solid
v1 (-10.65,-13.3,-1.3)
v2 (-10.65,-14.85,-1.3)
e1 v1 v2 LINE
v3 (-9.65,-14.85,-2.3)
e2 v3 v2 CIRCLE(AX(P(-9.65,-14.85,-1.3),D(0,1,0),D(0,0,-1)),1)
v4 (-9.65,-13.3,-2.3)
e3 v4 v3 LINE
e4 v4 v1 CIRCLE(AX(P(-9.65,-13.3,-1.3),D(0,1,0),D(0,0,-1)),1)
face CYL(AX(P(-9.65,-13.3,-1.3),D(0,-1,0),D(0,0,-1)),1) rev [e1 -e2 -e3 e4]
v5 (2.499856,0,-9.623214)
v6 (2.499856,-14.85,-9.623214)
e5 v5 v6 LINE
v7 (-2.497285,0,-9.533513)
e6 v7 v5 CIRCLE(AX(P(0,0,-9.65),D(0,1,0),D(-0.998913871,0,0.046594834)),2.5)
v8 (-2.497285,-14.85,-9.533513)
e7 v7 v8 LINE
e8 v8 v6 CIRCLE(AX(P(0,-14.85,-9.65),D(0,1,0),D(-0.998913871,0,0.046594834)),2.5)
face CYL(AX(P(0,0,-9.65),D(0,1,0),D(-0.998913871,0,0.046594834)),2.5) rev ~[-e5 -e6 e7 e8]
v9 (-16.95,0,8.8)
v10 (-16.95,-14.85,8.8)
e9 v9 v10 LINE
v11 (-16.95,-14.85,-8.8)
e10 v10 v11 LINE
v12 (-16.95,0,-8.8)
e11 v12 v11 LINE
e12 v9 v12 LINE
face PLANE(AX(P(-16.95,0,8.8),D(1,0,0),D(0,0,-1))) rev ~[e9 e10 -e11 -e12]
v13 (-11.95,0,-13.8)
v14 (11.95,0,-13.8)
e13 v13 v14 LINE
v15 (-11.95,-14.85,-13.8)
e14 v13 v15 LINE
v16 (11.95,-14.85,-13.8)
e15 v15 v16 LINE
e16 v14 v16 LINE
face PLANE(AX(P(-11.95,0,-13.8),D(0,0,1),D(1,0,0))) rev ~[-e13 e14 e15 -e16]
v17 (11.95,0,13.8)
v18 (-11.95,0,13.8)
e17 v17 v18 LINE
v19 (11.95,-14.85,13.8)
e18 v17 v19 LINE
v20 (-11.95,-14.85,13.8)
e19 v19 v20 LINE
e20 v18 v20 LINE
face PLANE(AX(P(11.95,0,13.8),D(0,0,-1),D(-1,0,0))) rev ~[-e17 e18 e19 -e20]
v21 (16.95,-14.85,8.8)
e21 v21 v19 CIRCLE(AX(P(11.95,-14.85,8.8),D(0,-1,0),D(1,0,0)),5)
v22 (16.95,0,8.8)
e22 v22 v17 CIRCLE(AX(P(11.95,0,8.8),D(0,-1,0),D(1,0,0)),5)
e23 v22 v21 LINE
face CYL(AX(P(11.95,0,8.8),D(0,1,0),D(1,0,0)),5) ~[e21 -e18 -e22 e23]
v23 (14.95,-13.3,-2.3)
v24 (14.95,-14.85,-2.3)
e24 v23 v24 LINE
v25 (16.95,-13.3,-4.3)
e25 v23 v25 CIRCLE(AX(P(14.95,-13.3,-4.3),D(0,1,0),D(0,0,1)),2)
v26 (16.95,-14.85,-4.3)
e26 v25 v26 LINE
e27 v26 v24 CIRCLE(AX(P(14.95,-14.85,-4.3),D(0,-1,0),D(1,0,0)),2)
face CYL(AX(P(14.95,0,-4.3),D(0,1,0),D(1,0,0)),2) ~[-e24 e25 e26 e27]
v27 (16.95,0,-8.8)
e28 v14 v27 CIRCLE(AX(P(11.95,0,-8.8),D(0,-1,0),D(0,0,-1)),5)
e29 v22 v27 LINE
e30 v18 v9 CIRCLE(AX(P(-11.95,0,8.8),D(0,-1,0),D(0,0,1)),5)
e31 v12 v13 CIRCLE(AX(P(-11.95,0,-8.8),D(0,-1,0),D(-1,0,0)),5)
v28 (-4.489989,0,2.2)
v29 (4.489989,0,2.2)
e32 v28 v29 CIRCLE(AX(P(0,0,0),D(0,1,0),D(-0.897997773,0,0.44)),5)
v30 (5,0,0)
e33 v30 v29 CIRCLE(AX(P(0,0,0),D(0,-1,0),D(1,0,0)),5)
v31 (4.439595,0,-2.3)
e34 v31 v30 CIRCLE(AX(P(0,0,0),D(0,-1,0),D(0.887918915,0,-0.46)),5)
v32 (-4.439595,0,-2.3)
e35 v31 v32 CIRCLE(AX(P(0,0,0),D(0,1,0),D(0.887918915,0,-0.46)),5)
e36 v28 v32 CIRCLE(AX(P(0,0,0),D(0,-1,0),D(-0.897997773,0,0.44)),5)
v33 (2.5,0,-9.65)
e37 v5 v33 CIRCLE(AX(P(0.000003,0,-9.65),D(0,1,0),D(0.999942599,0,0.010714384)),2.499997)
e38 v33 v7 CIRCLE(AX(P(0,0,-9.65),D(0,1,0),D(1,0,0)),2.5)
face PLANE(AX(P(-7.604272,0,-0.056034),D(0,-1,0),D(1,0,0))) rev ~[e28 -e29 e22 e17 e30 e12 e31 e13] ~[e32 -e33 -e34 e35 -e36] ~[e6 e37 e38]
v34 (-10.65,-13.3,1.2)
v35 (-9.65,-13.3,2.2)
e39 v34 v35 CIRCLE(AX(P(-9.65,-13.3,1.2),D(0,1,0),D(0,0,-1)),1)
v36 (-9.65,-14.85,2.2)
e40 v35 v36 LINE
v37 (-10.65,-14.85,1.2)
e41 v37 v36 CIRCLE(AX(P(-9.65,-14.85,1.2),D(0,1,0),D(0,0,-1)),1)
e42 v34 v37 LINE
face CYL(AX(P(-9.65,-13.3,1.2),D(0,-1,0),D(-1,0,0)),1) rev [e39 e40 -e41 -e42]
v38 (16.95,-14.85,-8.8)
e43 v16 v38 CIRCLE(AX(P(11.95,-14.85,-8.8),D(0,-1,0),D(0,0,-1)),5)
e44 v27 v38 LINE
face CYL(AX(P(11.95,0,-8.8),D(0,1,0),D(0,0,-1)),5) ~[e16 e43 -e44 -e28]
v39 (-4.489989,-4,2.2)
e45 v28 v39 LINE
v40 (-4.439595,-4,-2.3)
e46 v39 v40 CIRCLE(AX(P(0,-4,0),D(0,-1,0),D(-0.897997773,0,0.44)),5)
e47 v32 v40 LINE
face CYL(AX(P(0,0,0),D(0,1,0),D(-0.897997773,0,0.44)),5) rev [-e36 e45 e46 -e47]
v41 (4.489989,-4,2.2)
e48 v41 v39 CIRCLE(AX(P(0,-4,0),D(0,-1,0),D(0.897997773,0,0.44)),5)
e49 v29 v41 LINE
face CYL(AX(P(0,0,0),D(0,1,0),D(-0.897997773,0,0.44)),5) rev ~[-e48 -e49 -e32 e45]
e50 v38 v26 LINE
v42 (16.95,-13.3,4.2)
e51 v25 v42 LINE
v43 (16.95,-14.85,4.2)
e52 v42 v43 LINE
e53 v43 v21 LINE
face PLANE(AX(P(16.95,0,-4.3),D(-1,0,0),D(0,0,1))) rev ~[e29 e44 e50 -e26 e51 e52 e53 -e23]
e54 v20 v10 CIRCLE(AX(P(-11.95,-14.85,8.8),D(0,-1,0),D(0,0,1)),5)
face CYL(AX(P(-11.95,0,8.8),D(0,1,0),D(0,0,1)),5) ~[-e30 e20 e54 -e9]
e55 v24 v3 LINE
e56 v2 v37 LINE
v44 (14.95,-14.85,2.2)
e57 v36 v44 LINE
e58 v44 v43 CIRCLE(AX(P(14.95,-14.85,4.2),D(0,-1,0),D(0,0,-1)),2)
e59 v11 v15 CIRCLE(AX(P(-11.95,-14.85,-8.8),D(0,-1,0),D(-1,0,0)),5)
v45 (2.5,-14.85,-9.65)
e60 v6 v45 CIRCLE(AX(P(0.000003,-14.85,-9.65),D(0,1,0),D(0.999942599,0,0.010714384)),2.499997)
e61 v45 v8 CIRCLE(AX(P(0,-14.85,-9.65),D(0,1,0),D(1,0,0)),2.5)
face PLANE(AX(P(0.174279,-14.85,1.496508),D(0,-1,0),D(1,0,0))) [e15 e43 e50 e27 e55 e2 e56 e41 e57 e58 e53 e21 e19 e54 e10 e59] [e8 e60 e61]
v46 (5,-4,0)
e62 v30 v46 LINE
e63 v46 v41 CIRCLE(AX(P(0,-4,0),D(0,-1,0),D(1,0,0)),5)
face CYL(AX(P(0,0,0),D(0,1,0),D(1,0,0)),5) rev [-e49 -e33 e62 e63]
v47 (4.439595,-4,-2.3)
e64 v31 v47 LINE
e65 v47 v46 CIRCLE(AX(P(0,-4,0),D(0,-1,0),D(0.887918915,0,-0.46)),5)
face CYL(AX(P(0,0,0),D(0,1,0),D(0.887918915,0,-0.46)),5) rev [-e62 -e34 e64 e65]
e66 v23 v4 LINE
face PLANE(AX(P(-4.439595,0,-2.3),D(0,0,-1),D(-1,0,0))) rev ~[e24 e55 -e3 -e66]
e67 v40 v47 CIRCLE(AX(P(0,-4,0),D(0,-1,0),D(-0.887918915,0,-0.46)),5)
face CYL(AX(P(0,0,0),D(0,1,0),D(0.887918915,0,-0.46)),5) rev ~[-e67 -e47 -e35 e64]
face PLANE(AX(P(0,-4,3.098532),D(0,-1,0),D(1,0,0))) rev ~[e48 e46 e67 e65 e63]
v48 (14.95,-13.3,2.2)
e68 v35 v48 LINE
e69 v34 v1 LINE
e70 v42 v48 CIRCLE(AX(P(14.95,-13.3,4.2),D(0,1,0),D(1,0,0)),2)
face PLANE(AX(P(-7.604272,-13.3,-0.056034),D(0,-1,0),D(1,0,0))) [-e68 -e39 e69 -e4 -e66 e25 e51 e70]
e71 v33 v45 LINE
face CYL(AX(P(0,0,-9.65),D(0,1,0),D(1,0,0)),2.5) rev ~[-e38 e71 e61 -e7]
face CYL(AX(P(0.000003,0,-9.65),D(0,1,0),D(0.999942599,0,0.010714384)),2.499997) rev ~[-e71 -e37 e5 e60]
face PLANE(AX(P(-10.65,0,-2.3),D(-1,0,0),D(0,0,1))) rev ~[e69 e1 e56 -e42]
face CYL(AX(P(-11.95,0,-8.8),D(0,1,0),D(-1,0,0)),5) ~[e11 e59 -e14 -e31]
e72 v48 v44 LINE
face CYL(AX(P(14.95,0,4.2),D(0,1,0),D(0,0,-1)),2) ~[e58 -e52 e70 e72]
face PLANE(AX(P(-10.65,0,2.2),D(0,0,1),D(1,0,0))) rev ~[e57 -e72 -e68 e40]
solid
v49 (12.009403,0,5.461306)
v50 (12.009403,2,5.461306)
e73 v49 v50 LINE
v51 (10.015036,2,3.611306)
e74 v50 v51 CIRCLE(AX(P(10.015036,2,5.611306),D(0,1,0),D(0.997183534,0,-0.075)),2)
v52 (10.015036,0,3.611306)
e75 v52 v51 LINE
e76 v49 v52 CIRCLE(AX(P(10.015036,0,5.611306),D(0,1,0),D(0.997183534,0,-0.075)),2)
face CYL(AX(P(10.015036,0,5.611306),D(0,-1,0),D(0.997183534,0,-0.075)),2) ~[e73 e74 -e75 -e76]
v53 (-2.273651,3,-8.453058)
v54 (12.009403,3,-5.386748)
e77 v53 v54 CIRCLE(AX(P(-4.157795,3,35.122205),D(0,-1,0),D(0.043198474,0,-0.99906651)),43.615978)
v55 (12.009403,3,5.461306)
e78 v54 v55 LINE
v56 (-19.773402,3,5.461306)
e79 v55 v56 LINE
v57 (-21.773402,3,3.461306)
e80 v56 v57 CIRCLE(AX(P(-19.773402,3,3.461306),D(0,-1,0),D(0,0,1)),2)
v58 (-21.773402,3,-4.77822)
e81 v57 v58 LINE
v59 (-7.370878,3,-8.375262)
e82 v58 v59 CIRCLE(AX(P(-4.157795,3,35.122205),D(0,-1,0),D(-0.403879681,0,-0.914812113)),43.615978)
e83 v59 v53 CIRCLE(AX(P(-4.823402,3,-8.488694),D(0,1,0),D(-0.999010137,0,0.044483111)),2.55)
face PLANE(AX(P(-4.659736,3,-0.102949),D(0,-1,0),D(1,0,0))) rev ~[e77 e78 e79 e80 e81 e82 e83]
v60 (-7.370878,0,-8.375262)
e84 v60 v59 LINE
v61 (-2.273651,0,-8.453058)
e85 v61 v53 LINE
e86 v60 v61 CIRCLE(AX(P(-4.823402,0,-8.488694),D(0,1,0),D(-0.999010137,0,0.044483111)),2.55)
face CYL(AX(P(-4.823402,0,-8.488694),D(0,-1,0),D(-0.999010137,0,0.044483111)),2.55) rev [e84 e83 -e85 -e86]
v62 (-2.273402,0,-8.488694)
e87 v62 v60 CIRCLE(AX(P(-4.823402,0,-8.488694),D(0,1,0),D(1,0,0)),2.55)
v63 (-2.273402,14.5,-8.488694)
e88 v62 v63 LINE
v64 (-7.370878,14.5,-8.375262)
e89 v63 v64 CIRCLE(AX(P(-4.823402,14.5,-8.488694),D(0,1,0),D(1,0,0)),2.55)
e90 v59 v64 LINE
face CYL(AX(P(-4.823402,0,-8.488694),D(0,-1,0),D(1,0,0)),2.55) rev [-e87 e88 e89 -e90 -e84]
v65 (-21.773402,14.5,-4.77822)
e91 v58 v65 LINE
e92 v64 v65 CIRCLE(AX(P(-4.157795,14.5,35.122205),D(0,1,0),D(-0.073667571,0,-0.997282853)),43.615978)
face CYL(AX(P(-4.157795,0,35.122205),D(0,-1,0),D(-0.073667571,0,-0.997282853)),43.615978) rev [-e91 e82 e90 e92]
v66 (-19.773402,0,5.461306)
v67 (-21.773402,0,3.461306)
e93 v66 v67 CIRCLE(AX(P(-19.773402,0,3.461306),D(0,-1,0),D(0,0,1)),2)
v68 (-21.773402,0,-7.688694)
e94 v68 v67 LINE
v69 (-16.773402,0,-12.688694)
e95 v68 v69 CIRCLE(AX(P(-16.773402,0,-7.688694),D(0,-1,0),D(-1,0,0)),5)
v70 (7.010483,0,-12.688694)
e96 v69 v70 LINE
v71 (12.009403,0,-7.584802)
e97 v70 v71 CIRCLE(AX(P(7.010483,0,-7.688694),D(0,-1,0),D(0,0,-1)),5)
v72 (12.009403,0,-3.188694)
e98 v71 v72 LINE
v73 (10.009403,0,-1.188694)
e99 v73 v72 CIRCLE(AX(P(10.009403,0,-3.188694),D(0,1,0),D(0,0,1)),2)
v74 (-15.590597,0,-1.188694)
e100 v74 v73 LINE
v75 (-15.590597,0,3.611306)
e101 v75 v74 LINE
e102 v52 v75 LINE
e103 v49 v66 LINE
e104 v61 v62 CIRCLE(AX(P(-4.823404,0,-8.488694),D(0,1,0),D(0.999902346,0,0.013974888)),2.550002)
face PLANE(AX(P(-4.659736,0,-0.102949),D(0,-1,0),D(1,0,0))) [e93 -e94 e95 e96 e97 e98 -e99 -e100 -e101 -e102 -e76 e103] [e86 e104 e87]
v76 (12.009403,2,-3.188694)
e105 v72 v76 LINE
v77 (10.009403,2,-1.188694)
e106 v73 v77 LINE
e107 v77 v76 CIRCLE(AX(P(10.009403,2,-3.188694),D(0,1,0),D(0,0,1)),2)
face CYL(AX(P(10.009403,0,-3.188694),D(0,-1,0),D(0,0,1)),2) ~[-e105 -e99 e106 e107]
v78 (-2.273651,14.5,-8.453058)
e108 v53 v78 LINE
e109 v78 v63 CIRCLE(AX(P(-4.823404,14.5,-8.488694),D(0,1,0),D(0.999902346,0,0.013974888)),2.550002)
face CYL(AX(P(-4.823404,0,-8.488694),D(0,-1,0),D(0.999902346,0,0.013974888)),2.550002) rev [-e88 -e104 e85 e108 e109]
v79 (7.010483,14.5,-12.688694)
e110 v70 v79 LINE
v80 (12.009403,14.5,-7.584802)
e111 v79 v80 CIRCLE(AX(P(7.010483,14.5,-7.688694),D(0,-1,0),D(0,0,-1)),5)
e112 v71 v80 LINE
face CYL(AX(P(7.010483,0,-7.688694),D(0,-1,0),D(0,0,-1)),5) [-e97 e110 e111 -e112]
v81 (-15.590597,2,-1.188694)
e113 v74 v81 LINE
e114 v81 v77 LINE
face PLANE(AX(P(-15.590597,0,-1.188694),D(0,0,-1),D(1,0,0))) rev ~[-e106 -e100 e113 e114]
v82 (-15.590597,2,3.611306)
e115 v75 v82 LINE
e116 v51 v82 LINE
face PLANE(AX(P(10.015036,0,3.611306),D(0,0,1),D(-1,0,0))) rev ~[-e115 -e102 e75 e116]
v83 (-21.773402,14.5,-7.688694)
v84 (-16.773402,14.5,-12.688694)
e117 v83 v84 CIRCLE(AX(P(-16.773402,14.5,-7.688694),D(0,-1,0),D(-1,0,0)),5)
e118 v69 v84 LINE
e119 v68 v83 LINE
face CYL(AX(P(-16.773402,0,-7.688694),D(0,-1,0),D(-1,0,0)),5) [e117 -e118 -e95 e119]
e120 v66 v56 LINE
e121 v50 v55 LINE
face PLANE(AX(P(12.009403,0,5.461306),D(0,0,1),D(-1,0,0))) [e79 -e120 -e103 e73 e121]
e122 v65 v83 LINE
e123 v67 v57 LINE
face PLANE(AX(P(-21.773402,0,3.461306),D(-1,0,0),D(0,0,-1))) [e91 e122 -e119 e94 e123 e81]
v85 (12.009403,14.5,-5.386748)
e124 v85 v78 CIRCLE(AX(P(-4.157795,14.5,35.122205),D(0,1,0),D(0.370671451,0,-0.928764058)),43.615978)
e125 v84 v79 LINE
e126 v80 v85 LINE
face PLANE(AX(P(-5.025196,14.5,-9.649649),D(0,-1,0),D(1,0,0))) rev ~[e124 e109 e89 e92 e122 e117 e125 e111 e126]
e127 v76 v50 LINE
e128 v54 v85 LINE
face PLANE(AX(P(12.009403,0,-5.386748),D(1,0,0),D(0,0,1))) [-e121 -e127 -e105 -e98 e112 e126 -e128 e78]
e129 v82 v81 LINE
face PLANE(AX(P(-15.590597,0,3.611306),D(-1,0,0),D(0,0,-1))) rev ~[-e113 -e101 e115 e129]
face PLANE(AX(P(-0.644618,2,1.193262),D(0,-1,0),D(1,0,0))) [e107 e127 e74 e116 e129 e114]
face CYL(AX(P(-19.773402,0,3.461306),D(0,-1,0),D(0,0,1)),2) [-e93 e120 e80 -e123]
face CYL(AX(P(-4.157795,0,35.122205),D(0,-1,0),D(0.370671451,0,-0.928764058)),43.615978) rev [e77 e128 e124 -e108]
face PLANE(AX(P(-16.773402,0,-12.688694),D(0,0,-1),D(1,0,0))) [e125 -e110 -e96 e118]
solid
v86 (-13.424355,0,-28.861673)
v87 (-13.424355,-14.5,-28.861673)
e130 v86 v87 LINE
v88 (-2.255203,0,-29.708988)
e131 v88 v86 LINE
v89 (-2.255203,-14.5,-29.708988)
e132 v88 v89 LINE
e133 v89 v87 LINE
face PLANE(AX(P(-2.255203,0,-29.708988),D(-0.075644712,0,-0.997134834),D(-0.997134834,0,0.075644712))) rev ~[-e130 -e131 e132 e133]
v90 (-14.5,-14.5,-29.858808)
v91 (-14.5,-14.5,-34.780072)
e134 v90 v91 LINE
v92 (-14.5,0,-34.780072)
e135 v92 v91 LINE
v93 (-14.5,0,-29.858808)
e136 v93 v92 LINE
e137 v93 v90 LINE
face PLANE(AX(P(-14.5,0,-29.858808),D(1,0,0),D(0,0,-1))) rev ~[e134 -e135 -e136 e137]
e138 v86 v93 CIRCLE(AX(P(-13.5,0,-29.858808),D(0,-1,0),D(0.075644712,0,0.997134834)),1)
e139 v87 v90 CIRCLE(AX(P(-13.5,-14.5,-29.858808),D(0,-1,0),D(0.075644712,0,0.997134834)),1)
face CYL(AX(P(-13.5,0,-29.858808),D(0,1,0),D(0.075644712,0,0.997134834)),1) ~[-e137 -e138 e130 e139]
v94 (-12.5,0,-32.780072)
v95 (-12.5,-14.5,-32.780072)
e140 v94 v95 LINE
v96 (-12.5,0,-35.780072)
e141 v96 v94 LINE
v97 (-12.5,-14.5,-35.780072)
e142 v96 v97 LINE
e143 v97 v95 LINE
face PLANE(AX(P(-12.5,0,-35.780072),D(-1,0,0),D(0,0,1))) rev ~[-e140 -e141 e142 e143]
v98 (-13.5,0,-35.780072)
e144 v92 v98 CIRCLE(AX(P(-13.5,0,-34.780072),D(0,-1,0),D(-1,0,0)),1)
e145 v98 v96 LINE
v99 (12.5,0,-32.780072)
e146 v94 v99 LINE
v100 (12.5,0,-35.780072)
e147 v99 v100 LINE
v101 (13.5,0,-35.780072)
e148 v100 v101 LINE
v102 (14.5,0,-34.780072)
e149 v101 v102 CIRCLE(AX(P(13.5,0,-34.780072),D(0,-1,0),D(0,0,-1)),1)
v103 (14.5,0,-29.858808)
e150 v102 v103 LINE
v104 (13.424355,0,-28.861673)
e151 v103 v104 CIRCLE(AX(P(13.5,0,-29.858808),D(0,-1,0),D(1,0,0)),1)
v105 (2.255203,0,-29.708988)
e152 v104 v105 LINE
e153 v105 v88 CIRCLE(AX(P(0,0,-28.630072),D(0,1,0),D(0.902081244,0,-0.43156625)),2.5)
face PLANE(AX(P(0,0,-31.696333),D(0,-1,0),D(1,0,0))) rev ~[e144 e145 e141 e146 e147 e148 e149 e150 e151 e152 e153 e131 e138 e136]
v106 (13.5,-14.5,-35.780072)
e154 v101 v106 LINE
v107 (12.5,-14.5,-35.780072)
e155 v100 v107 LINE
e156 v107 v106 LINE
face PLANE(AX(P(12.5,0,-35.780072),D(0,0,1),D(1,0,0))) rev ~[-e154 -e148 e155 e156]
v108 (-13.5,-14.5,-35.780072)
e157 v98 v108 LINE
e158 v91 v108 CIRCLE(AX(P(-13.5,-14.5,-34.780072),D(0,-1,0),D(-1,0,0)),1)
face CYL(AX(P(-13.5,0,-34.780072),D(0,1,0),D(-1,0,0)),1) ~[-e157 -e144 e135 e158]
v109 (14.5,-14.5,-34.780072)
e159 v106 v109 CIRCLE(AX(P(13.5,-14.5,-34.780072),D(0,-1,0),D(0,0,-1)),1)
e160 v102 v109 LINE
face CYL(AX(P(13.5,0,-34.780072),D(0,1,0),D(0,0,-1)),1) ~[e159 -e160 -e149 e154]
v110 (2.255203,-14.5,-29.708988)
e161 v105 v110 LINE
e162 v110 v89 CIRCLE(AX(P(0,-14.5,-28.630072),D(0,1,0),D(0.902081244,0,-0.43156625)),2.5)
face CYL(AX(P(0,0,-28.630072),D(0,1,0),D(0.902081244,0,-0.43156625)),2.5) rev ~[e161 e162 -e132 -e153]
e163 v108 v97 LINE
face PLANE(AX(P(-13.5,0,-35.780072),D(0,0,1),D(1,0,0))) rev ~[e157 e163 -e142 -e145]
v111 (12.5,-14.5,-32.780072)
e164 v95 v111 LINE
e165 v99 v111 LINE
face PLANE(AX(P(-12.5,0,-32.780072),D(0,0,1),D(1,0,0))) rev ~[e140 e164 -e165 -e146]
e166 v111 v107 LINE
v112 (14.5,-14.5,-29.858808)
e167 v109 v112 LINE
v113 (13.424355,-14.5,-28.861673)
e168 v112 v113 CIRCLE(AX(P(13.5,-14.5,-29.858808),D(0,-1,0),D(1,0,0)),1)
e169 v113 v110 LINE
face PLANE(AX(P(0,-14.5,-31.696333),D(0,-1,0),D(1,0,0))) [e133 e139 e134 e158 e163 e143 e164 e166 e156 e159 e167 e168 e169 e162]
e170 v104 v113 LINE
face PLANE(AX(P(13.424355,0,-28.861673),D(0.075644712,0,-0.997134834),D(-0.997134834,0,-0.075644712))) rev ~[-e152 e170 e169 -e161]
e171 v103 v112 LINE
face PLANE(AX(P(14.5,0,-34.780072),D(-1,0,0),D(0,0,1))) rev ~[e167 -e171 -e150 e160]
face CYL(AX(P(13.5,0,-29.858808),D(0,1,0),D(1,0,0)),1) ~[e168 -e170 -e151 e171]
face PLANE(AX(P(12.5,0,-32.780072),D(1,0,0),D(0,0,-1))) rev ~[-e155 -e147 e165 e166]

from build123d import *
from build123d import SkipClean  # not in build123d's __all__

# Parameters (mm, degrees)
F1_DEPTH  = 14.85
F2_DEPTH  = 13.3
F3_START  = 4
F3_DEPTH  = 9.3
F4_DEPTH  = 4
F5_START  = 4
F5_DEPTH  = 10.85
F6_R      = 1
F8_DEPTH  = 14.5
F9_DEPTH  = 3
F10_DEPTH = 2
F12_DEPTH = 14.5


with BuildPart() as f1:
    # F0 (on Front) → F1 (new body)
    with BuildSketch(Plane.XZ):
        with BuildLine():
            Line((11.95, 13.8), (-11.95, 13.8))
            ThreePointArc((-11.95, 13.8), (-15.4855339059, 12.3355339059), (-16.95, 8.8))
            Line((-16.95, 8.8), (-16.95, -5.8895261027))
            ThreePointArc((-16.95, -5.8895261027), (-9.8804541895, -8.3334638669), (-2.4972846772, -9.5335129141))
            ThreePointArc((-2.4972846772, -9.5335129141), (0.0448690015, -7.1504026779), (2.4998564985, -9.6232140564))
            ThreePointArc((2.4998564985, -9.6232140564), (9.8559923461, -8.7028657635), (16.95, -6.55))
            Line((16.95, -6.55), (16.95, -4.3))
            ThreePointArc((16.95, -4.3), (16.3642135624, -2.8857864376), (14.95, -2.3))
            Line((14.95, -2.3), (4.4395945761, -2.3))
            ThreePointArc((4.4395945761, -2.3), (0, -5), (-4.4395945761, -2.3))
            Line((-4.4395945761, -2.3), (-10.65, -2.3))
            Line((-10.65, -2.3), (-10.65, 2.2))
            Line((-10.65, 2.2), (-4.4899888641, 2.2))
            ThreePointArc((-4.4899888641, 2.2), (0, 5), (4.4899888641, 2.2))
            Line((4.4899888641, 2.2), (14.95, 2.2))
            ThreePointArc((14.95, 2.2), (16.3642135624, 2.7857864376), (16.95, 4.2))
            Line((16.95, 4.2), (16.95, 8.8))
            ThreePointArc((16.95, 8.8), (15.4855339059, 12.3355339059), (11.95, 13.8))
        make_face()
        with BuildLine():
            ThreePointArc((-2.4972846772, -9.5335129141), (-9.8804541895, -8.3334638669), (-16.95, -5.8895261027))
            Line((-16.95, -5.8895261027), (-16.95, -8.8))
            ThreePointArc((-16.95, -8.8), (-15.4855339059, -12.3355339059), (-11.95, -13.8))
            Line((-11.95, -13.8), (11.95, -13.8))
            ThreePointArc((11.95, -13.8), (15.4855339059, -12.3355339059), (16.95, -8.8))
            Line((16.95, -8.8), (16.95, -6.55))
            ThreePointArc((16.95, -6.55), (9.8559923461, -8.7028657635), (2.4998564985, -9.6232140564))
            ThreePointArc((2.4998564985, -9.6232140564), (2.4999641244, -9.636606836), (2.5, -9.65))
            ThreePointArc((2.5, -9.65), (-0.0582593644, -12.1493210771), (-2.4972846772, -9.5335129141))
        make_face()
    extrude(amount=F1_DEPTH)

    # F0 (on Front) → F2 (join)
    with BuildSketch(Plane.XZ):
        with BuildLine():
            ThreePointArc((-4.4395945761, -2.3), (-4.9996865006, -0.0559901426), (-4.4899888641, 2.2))
            Line((-4.4899888641, 2.2), (-10.65, 2.2))
            Line((-10.65, 2.2), (-10.65, -2.3))
            Line((-10.65, -2.3), (-4.4395945761, -2.3))
        make_face()
        with BuildLine():
            ThreePointArc((5, 0), (4.8708286934, 1.1291713066), (4.4899888641, 2.2))
            Line((4.4899888641, 2.2), (-4.4899888641, 2.2))
            ThreePointArc((-4.4899888641, 2.2), (-4.9996865006, -0.0559901426), (-4.4395945761, -2.3))
            Line((-4.4395945761, -2.3), (4.4395945761, -2.3))
            ThreePointArc((4.4395945761, -2.3), (4.8578788005, -1.1836441863), (5, 0))
        make_face()
        with BuildLine():
            Line((16.95, 2.2), (16.95, 4.2))
            ThreePointArc((16.95, 4.2), (16.3642135624, 2.7857864376), (14.95, 2.2))
            Line((14.95, 2.2), (4.4899888641, 2.2))
            ThreePointArc((4.4899888641, 2.2), (4.8708286934, 1.1291713066), (5, 0))
            ThreePointArc((5, 0), (4.8578788005, -1.1836441863), (4.4395945761, -2.3))
            Line((4.4395945761, -2.3), (14.95, -2.3))
            ThreePointArc((14.95, -2.3), (16.3642135624, -2.8857864376), (16.95, -4.3))
            Line((16.95, -4.3), (16.95, -2.3))
            Line((16.95, -2.3), (16.95, 2.2))
        make_face()
    extrude(amount=F2_DEPTH)

    # F0 (on Front) → F3 (join)
    with BuildSketch(Plane.XZ.offset(F3_START)):
        with BuildLine():
            Line((-4.4899888641, 2.2), (4.4899888641, 2.2))
            ThreePointArc((4.4899888641, 2.2), (0, 5), (-4.4899888641, 2.2))
        make_face()
        with BuildLine():
            Line((4.4395945761, -2.3), (-4.4395945761, -2.3))
            ThreePointArc((-4.4395945761, -2.3), (0, -5), (4.4395945761, -2.3))
        make_face()
        with BuildLine():
            ThreePointArc((5, 0), (4.8708286934, 1.1291713066), (4.4899888641, 2.2))
            Line((4.4899888641, 2.2), (-4.4899888641, 2.2))
            ThreePointArc((-4.4899888641, 2.2), (-4.9996865006, -0.0559901426), (-4.4395945761, -2.3))
            Line((-4.4395945761, -2.3), (4.4395945761, -2.3))
            ThreePointArc((4.4395945761, -2.3), (4.8578788005, -1.1836441863), (5, 0))
        make_face()
    extrude(amount=F3_DEPTH)

    # F0 (on Front) → F4 (cut)
    with BuildSketch(Plane.XZ):
        with BuildLine():
            ThreePointArc((5, 0), (4.8708286934, 1.1291713066), (4.4899888641, 2.2))
            Line((4.4899888641, 2.2), (-4.4899888641, 2.2))
            ThreePointArc((-4.4899888641, 2.2), (-4.9996865006, -0.0559901426), (-4.4395945761, -2.3))
            Line((-4.4395945761, -2.3), (4.4395945761, -2.3))
            ThreePointArc((4.4395945761, -2.3), (4.8578788005, -1.1836441863), (5, 0))
        make_face()
    with SkipClean():  # cleaning this boolean's faces spoils the solid; the shape is the same uncleaned
        extrude(amount=F4_DEPTH, mode=Mode.SUBTRACT)

    # F0 (on Front) → F5 (join)
    with BuildSketch(Plane.XZ.offset(F5_START)):
        with BuildLine():
            Line((-4.4899888641, 2.2), (4.4899888641, 2.2))
            ThreePointArc((4.4899888641, 2.2), (0, 5), (-4.4899888641, 2.2))
        make_face()
        with BuildLine():
            Line((4.4395945761, -2.3), (-4.4395945761, -2.3))
            ThreePointArc((-4.4395945761, -2.3), (0, -5), (4.4395945761, -2.3))
        make_face()
    with SkipClean():  # cleaning this boolean's faces spoils the solid; the shape is the same uncleaned
        extrude(amount=F5_DEPTH)

    # F6
    f6_edges = [f1.edges().sort_by_distance(p)[0] for p in [
        (-10.65, -14.075, 2.2),
        (-10.65, -14.075, -2.3),
    ]]
    fillet(f6_edges, radius=F6_R)


with BuildPart() as f8:
    # F7 (on Front) → F8 (new body)
    with BuildSketch(Plane.XZ):
        with BuildLine():
            ThreePointArc((-21.773402003, -7.6886942186), (-20.308935909, -11.2242281245), (-16.773402003, -12.6886942186))
            Line((-16.773402003, -12.6886942186), (7.0104826284, -12.6886942186))
            ThreePointArc((7.0104826284, -12.6886942186), (10.5825591861, -11.187303809), (12.0094031494, -7.584801845))
            Line((12.0094031494, -7.584801845), (12.0094031494, -5.3867480318))
            ThreePointArc((12.0094031494, -5.3867480318), (4.9971655581, -7.5221412361), (-2.2736510197, -8.4530582387))
            ThreePointArc((-2.2736510197, -8.4530582387), (-2.273464258, -8.4708757937), (-2.273402003, -8.4886942186))
            ThreePointArc((-2.273402003, -8.4886942186), (-4.8801320097, -11.0380631025), (-7.3708778511, -8.3752622863))
            ThreePointArc((-7.3708778511, -8.3752622863), (-14.7262981055, -7.1939892841), (-21.773402003, -4.7782203213))
            Line((-21.773402003, -4.7782203213), (-21.773402003, -7.6886942186))
        make_face()
    extrude(amount=-F8_DEPTH)

    # F7 (on Front) → F9 (join)
    with BuildSketch(Plane.XZ):
        with BuildLine():
            Line((-21.773402003, 3.4613057814), (-21.773402003, -4.7782203213))
            ThreePointArc((-21.773402003, -4.7782203213), (-14.7262981055, -7.1939892841), (-7.3708778511, -8.3752622863))
            ThreePointArc((-7.3708778511, -8.3752622863), (-4.7844873963, -5.9389911666), (-2.2736510197, -8.4530582387))
            ThreePointArc((-2.2736510197, -8.4530582387), (4.9971655581, -7.5221412361), (12.0094031494, -5.3867480318))
            Line((12.0094031494, -5.3867480318), (12.0094031494, -3.1886942186))
            ThreePointArc((12.0094031494, -3.1886942186), (11.4236167118, -1.7744806562), (10.0094031494, -1.1886942186))
            Line((10.0094031494, -1.1886942186), (-15.5905968506, -1.1886942186))
            Line((-15.5905968506, -1.1886942186), (-15.5905968506, 3.6113057814))
            Line((-15.5905968506, 3.6113057814), (10.0150360819, 3.6113057814))
            ThreePointArc((10.0150360819, 3.6113057814), (11.3751831327, 4.1450179515), (12.0094031494, 5.4613057814))
            Line((12.0094031494, 5.4613057814), (-19.773402003, 5.4613057814))
            ThreePointArc((-19.773402003, 5.4613057814), (-21.1876155654, 4.8755193438), (-21.773402003, 3.4613057814))
        make_face()
        with BuildLine():
            ThreePointArc((10.0094031494, -1.1886942186), (11.4236167118, -1.7744806562), (12.0094031494, -3.1886942186))
            Line((12.0094031494, -3.1886942186), (12.0094031494, -1.1886942186))
            Line((12.0094031494, -1.1886942186), (12.0094031494, 3.3113057814))
            Line((12.0094031494, 3.3113057814), (12.0094031494, 5.4613057814))
            ThreePointArc((12.0094031494, 5.4613057814), (11.3751831327, 4.1450179515), (10.0150360819, 3.6113057814))
            Line((10.0150360819, 3.6113057814), (-15.5905968506, 3.6113057814))
            Line((-15.5905968506, 3.6113057814), (-15.5905968506, -1.1886942186))
            Line((-15.5905968506, -1.1886942186), (10.0094031494, -1.1886942186))
        make_face()
    extrude(amount=-F9_DEPTH)

    # F7 (on Front) → F10 (cut)
    with BuildSketch(Plane.XZ):
        with BuildLine():
            ThreePointArc((10.0094031494, -1.1886942186), (11.4236167118, -1.7744806562), (12.0094031494, -3.1886942186))
            Line((12.0094031494, -3.1886942186), (12.0094031494, -1.1886942186))
            Line((12.0094031494, -1.1886942186), (12.0094031494, 3.3113057814))
            Line((12.0094031494, 3.3113057814), (12.0094031494, 5.4613057814))
            ThreePointArc((12.0094031494, 5.4613057814), (11.3751831327, 4.1450179515), (10.0150360819, 3.6113057814))
            Line((10.0150360819, 3.6113057814), (-15.5905968506, 3.6113057814))
            Line((-15.5905968506, 3.6113057814), (-15.5905968506, -1.1886942186))
            Line((-15.5905968506, -1.1886942186), (10.0094031494, -1.1886942186))
        make_face()
    extrude(amount=-F10_DEPTH, mode=Mode.SUBTRACT)


with BuildPart() as f12:
    # F11 (on Front) → F12 (new body)
    with BuildSketch(Plane.XZ):
        with BuildLine():
            Line((-12.5, -32.7800722122), (0, -32.7800722122))
            Line((0, -32.7800722122), (12.5, -32.7800722122))
            Line((12.5, -32.7800722122), (12.5, -35.7800722122))
            Line((12.5, -35.7800722122), (13.5, -35.7800722122))
            ThreePointArc((13.5, -35.7800722122), (14.2071067812, -35.4871789934), (14.5, -34.7800722122))
            Line((14.5, -34.7800722122), (14.5, -29.8588076797))
            ThreePointArc((14.5, -29.8588076797), (14.1798364834, -29.1254439529), (13.4243552884, -28.8616728455))
            Line((13.4243552884, -28.8616728455), (2.255203111, -29.7089878383))
            ThreePointArc((2.255203111, -29.7089878383), (0, -31.1300722122), (-2.255203111, -29.7089878383))
            Line((-2.255203111, -29.7089878383), (-13.4243552884, -28.8616728455))
            ThreePointArc((-13.4243552884, -28.8616728455), (-14.1798364834, -29.1254439529), (-14.5, -29.8588076797))
            Line((-14.5, -29.8588076797), (-14.5, -34.7800722122))
            ThreePointArc((-14.5, -34.7800722122), (-14.2071067812, -35.4871789934), (-13.5, -35.7800722122))
            Line((-13.5, -35.7800722122), (-12.5, -35.7800722122))
            Line((-12.5, -35.7800722122), (-12.5, -32.7800722122))
        make_face()
    extrude(amount=F12_DEPTH)


solid = Compound([f1.part, f8.part, f12.part])
